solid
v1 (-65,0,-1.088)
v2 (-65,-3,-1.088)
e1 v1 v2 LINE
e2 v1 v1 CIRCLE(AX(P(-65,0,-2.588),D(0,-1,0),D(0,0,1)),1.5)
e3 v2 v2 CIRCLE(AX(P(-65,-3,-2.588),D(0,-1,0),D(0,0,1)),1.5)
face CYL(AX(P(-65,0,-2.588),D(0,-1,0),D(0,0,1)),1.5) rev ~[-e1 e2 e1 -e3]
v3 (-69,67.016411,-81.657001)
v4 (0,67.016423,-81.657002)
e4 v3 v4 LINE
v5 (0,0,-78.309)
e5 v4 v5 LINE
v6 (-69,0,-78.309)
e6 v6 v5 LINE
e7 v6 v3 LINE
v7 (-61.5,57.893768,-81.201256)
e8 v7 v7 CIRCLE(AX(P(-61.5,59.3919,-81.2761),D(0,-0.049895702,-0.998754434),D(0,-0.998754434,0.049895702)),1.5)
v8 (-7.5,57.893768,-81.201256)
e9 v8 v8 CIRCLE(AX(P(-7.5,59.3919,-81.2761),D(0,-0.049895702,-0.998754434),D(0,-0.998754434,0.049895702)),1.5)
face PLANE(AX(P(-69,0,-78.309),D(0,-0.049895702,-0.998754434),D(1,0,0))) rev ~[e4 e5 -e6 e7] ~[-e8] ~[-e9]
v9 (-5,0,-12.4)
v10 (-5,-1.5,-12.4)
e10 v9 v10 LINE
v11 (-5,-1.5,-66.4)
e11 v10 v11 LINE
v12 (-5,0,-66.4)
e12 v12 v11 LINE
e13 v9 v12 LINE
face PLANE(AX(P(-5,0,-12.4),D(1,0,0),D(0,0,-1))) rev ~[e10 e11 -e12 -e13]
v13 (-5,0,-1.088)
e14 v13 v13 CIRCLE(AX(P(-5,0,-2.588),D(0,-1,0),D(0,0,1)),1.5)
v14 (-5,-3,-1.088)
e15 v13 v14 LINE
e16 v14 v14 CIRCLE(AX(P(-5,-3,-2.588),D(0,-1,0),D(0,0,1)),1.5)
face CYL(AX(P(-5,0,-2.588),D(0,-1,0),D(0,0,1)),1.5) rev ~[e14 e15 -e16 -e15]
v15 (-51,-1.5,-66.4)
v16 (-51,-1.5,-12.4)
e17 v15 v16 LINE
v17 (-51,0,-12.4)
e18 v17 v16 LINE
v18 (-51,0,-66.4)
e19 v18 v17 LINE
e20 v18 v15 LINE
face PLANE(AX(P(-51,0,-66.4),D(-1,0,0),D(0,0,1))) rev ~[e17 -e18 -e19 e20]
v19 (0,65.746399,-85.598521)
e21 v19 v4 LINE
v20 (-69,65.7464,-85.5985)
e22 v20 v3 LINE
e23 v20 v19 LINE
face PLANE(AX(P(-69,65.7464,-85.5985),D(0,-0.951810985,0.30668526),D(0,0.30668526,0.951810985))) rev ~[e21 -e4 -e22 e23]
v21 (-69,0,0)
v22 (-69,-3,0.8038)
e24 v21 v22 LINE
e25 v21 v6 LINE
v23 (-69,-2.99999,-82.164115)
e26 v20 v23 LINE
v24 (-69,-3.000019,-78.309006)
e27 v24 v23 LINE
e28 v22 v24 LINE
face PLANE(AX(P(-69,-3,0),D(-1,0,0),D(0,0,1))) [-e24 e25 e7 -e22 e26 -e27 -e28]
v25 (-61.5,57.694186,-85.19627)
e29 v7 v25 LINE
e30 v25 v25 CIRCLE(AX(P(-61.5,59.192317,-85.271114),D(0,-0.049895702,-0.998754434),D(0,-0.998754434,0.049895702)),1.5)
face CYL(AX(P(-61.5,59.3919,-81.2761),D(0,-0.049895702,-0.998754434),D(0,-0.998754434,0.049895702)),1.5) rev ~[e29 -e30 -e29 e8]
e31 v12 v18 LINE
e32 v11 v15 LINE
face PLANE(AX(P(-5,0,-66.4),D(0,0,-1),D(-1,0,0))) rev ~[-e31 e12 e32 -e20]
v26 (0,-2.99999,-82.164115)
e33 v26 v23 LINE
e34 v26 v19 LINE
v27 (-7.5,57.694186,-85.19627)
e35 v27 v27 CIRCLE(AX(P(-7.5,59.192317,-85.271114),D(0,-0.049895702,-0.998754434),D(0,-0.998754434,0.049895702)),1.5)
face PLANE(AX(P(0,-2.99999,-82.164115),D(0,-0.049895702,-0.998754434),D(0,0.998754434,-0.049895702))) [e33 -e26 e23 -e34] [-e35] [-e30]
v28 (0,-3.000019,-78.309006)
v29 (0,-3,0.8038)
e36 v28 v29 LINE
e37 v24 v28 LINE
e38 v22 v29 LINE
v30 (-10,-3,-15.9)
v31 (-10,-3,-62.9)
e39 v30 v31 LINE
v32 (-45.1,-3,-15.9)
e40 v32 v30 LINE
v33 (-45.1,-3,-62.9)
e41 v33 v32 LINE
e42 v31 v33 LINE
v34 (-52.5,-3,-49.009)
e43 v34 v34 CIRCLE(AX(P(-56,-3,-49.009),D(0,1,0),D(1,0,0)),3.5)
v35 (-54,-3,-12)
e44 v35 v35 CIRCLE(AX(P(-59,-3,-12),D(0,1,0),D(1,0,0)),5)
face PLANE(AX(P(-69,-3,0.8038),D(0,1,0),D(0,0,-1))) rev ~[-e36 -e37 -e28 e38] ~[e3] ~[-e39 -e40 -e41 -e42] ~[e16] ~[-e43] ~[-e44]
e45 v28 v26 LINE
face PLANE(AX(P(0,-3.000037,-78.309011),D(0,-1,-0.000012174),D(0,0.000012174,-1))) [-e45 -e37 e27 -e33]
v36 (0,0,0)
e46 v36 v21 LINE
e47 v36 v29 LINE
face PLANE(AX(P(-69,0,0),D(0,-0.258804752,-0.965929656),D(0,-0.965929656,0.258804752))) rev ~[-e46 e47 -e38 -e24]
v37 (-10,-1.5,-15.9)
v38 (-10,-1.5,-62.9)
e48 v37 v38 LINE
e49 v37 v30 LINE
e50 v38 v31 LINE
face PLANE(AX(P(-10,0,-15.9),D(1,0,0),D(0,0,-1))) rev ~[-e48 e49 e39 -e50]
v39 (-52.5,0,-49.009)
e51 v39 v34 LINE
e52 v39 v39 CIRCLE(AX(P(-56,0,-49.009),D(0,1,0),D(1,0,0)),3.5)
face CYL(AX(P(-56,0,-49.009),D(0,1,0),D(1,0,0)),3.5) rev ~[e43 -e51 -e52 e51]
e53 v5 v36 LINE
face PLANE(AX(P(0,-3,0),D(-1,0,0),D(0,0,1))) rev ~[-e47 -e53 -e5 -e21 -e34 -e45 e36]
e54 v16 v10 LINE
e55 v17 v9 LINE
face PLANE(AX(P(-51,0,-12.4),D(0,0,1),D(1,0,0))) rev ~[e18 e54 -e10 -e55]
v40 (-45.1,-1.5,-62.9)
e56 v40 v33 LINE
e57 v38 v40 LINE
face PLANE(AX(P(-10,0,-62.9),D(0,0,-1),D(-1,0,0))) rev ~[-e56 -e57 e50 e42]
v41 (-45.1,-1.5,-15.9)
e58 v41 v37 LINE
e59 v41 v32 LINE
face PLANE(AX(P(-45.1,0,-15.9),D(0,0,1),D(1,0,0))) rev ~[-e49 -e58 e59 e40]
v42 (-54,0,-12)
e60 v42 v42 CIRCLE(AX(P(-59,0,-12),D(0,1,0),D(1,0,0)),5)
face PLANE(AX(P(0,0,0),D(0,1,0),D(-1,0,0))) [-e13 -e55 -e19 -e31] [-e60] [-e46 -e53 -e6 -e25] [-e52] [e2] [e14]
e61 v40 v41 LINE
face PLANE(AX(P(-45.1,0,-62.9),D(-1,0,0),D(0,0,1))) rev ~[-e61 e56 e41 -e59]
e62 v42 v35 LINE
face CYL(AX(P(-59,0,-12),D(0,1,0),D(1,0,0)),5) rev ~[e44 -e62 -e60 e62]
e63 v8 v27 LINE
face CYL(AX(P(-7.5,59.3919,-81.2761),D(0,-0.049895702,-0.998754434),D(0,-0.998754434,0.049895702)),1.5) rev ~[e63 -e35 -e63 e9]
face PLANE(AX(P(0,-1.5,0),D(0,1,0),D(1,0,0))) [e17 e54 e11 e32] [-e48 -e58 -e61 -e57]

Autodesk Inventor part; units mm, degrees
ref_plane "YZ Plane" through (0, 0, 0) normal (1, 0, 0) x (0, 1, 0)
ref_plane "XZ Plane" through (0, 0, 0) normal (0, 1, 0) x (-1, 0, 0)
sketch "Skizze1" plane through (0, 0, 0) normal (0, 1, 0) x (-1, 0, 0)
  line L0 (0, 0) -> (69, 0)
  line L1 (69, 0) -> (69, -78.309)
  line L2 (69, -78.309) -> (0, -78.309)
  line L3 (0, -78.309) -> (0, 0)
  dimension "d0" = 69
  dimension "d1" = 78.309
extrude "Extrusion1" add sketch "Skizze1" against normal blind 3
ref_plane "Arbeitsebene1" through (-69, 0, -78.309) normal (0, -0.0498957, -0.9987544) x (1, 0, 0)
sketch "Skizze2" plane through (-69, 0, -78.309) normal (0, -0.0498957, -0.9987544) x (1, 0, 0)
  line L0 (0, 0) -> (69, 0) projected
  line L1 (69, 0) -> (69, 2.9963) projected
  line L2 (0, 2.9963) -> (69, 2.9963) projected
  line L3 (0, 0) -> (0, 2.9963) projected
  line L4 (69, 0) -> (0, 0)
  line L5 (0, 0) -> (0, -67.1)
  line L6 (0, -67.1) -> (69, -67.1)
  line L7 (69, -67.1) -> (69, 0)
  point P0 (69, 3.9073)
  dimension "d5" = 69
  dimension "d6" = 67.1
extrude "Extrusion2" add sketch "Skizze2" along normal blind 4 contours L0 L7 L6 L5
sketch "Skizze4" plane through (-69, 0, -78.309) normal (0, 0.0498957, 0.9987544) x (1, 0, 0)
  line L0 (0, 0) -> (0, 67.1) projected
  line L1 (0, 67.1) -> (69, 67.1) projected
  line L2 (69, 67.1) -> (69, 0) projected
  line L3 (0, 0) -> (69, 0) projected
  line L4 (69, 67.1) -> (69, 0) projected
  line L5 (0, 67.1) -> (69, 67.1) projected
  line L6 (0, 0) -> (0, 67.1) projected
  line L7 (69, 0) -> (0, 0) projected
  point P0 (69, -3.9073)
  point P1 (61.5, 59.466)
  point P2 (7.5, 59.466)
  dimension "d12" = 7.634
  dimension "d14" = 7.5
  dimension "d15" = 7.634
  dimension "d16" = 7.5
hole "Bohrung1" at (-7.5, 59.3919, -81.2761) at (-61.5, 59.3919, -81.2761) direction (0, -0.0498957, -0.9987544) diameter 3 depth 8 tip angle 118
sketch "Skizze5" plane through (0, 0, 0) normal (0, 1, 0) x (1, 0, 0)
  line L0 (0, 0) -> (-69, 0) projected
  line L1 (0, 78.309) -> (0, 0) projected
  line L2 (-69, 78.309) -> (0, 78.309) projected
  line L3 (-69, 0) -> (-69, 78.309) projected
  line L4 (-10, 62.9) -> (-45.1, 62.9)
  line L5 (-45.1, 62.9) -> (-45.1, 15.9)
  line L6 (-45.1, 15.9) -> (-10, 15.9)
  line L7 (-10, 15.9) -> (-10, 62.9)
  line L8 (-5, 66.4) -> (-51, 66.4)
  line L9 (-51, 66.4) -> (-51, 12.4)
  line L10 (-51, 12.4) -> (-5, 12.4)
  line L11 (-5, 12.4) -> (-5, 66.4)
  circle A0 centre (-59, 12) radius 5
  circle A1 centre (-56, 49.009) radius 3.5
  point P0 (-5, 2.588)
  point P1 (-65, 2.588)
  dimension "d24" = 35.1
  dimension "d25" = 47
  dimension "d26" = 54
  dimension "d27" = 46
  dimension "d28" = 5
  dimension "d29" = 3.5
  dimension "d30" = 12.4
  dimension "d31" = 5
  dimension "d32" = 7
  dimension "d34" = 13
  dimension "d35" = 10
  dimension "d37" = 10
  dimension "d40" = 5
  dimension "d41" = 2.588
  dimension "d42" = 4
  dimension "d56" = 29.3
  dimension "d57" = 12
extrude "Extrusion4" cut sketch "Skizze5" against normal blind 69 contours L7 L6 L5 L4 | A0 | A1
extrude "Extrusion5" cut sketch "Skizze5" against normal blind 1.5 contours L11 L10 L9 L8
hole "Bohrung2" at (-5, 0, -2.588) at (-65, 0, -2.588) direction (0, -1, 0) diameter 3 depth 8 tip angle 118
sketch "Skizze6" plane through (0, 0, -78.309) normal (1, 0, 0) x (0, -0.0498957, -0.9987544)
  line L0 (0, 0) -> (0.1497, -2.9963) projected
  line L1 (0, 0) -> (-78.2115, -3.9073) projected
  line L2 (-78.2115, -3.9073) -> (-78.0618, -6.9035) projected
  line L3 (0.1497, -2.9963) -> (-78.0618, -6.9035) projected
  line L4 (0, 0) -> (0.1497, -2.9963) projected
  line L5 (0, 67.1) -> (0, 0) projected
  line L6 (0, 0) -> (4, 0) projected
  line L7 (4, 67.1) -> (4, 0) projected
  line L8 (0, 67.1) -> (4, 67.1) projected
  line L9 (4, 0) -> (0, 0)
  line L10 (0, 0) -> (4, 0) projected
  line L11 (0, 0) -> (0.1497, -2.9963)
  line L12 (0.1497, -2.9963) -> (4, -2.8039)
  line L13 (4, -2.8039) -> (4, 0)
  line L14 (0.1497, -2.9963) -> (-78.0618, -6.9035) projected
  point P0 (4, 0)
extrude "Extrusion6" add sketch "Skizze6" against normal blind 69 contours L6 L13 L12 L0
sketch "Skizze7" plane through (-69, -3, 0) normal (-1, 0, 0) x (0, 0, 1)
  line L0 (0, 3) -> (-78.309, 3) projected
  line L1 (-78.309, 3) -> (-81.657, 70.0164) projected
  line L2 (-81.657, 70.0164) -> (-85.652, 69.8168) projected
  line L3 (-85.652, 69.8168) -> (-82.1641, 0) projected
  line L4 (0, 0) -> (-82.1641, 0) projected
  line L5 (0, 3) -> (0, 0) projected
  line L6 (-78.309, 3) -> (-81.657, 70.0164) projected
  line L7 (-85.652, 69.8168) -> (-82.1641, 0) projected
  line L8 (-85.5985, 68.7464) -> (-81.657, 70.0164)
  line L9 (0, 0) -> (0, 3)
  line L10 (0, 0) -> (0, 3)
  line L11 (0, 3) -> (0.8038, 0)
  line L12 (0.8038, 0) -> (0, 0)
  line L13 (0.8038, 0) -> (0, 0)
  line L14 (0, 0) -> (0, 3)
  line L15 (0, 3) -> (0.8038, 3)
  line L16 (0.8038, 3) -> (0.8038, 0)
  line L17 (0, 0) -> (0, 3)
  line L18 (0, 3) -> (0, 0) projected
  point P0 (-0.4568, 4.2362)
  dimension "d59" = 15
  dimension "d62" = 15
extrude "Extrusion7" cut sketch "Skizze7" against normal blind 80 contours L8 L3 L2
extrude "Extrusion8" add sketch "Skizze7" against normal blind 69 contours L11 L12 L5
properties part number "Dekel"
